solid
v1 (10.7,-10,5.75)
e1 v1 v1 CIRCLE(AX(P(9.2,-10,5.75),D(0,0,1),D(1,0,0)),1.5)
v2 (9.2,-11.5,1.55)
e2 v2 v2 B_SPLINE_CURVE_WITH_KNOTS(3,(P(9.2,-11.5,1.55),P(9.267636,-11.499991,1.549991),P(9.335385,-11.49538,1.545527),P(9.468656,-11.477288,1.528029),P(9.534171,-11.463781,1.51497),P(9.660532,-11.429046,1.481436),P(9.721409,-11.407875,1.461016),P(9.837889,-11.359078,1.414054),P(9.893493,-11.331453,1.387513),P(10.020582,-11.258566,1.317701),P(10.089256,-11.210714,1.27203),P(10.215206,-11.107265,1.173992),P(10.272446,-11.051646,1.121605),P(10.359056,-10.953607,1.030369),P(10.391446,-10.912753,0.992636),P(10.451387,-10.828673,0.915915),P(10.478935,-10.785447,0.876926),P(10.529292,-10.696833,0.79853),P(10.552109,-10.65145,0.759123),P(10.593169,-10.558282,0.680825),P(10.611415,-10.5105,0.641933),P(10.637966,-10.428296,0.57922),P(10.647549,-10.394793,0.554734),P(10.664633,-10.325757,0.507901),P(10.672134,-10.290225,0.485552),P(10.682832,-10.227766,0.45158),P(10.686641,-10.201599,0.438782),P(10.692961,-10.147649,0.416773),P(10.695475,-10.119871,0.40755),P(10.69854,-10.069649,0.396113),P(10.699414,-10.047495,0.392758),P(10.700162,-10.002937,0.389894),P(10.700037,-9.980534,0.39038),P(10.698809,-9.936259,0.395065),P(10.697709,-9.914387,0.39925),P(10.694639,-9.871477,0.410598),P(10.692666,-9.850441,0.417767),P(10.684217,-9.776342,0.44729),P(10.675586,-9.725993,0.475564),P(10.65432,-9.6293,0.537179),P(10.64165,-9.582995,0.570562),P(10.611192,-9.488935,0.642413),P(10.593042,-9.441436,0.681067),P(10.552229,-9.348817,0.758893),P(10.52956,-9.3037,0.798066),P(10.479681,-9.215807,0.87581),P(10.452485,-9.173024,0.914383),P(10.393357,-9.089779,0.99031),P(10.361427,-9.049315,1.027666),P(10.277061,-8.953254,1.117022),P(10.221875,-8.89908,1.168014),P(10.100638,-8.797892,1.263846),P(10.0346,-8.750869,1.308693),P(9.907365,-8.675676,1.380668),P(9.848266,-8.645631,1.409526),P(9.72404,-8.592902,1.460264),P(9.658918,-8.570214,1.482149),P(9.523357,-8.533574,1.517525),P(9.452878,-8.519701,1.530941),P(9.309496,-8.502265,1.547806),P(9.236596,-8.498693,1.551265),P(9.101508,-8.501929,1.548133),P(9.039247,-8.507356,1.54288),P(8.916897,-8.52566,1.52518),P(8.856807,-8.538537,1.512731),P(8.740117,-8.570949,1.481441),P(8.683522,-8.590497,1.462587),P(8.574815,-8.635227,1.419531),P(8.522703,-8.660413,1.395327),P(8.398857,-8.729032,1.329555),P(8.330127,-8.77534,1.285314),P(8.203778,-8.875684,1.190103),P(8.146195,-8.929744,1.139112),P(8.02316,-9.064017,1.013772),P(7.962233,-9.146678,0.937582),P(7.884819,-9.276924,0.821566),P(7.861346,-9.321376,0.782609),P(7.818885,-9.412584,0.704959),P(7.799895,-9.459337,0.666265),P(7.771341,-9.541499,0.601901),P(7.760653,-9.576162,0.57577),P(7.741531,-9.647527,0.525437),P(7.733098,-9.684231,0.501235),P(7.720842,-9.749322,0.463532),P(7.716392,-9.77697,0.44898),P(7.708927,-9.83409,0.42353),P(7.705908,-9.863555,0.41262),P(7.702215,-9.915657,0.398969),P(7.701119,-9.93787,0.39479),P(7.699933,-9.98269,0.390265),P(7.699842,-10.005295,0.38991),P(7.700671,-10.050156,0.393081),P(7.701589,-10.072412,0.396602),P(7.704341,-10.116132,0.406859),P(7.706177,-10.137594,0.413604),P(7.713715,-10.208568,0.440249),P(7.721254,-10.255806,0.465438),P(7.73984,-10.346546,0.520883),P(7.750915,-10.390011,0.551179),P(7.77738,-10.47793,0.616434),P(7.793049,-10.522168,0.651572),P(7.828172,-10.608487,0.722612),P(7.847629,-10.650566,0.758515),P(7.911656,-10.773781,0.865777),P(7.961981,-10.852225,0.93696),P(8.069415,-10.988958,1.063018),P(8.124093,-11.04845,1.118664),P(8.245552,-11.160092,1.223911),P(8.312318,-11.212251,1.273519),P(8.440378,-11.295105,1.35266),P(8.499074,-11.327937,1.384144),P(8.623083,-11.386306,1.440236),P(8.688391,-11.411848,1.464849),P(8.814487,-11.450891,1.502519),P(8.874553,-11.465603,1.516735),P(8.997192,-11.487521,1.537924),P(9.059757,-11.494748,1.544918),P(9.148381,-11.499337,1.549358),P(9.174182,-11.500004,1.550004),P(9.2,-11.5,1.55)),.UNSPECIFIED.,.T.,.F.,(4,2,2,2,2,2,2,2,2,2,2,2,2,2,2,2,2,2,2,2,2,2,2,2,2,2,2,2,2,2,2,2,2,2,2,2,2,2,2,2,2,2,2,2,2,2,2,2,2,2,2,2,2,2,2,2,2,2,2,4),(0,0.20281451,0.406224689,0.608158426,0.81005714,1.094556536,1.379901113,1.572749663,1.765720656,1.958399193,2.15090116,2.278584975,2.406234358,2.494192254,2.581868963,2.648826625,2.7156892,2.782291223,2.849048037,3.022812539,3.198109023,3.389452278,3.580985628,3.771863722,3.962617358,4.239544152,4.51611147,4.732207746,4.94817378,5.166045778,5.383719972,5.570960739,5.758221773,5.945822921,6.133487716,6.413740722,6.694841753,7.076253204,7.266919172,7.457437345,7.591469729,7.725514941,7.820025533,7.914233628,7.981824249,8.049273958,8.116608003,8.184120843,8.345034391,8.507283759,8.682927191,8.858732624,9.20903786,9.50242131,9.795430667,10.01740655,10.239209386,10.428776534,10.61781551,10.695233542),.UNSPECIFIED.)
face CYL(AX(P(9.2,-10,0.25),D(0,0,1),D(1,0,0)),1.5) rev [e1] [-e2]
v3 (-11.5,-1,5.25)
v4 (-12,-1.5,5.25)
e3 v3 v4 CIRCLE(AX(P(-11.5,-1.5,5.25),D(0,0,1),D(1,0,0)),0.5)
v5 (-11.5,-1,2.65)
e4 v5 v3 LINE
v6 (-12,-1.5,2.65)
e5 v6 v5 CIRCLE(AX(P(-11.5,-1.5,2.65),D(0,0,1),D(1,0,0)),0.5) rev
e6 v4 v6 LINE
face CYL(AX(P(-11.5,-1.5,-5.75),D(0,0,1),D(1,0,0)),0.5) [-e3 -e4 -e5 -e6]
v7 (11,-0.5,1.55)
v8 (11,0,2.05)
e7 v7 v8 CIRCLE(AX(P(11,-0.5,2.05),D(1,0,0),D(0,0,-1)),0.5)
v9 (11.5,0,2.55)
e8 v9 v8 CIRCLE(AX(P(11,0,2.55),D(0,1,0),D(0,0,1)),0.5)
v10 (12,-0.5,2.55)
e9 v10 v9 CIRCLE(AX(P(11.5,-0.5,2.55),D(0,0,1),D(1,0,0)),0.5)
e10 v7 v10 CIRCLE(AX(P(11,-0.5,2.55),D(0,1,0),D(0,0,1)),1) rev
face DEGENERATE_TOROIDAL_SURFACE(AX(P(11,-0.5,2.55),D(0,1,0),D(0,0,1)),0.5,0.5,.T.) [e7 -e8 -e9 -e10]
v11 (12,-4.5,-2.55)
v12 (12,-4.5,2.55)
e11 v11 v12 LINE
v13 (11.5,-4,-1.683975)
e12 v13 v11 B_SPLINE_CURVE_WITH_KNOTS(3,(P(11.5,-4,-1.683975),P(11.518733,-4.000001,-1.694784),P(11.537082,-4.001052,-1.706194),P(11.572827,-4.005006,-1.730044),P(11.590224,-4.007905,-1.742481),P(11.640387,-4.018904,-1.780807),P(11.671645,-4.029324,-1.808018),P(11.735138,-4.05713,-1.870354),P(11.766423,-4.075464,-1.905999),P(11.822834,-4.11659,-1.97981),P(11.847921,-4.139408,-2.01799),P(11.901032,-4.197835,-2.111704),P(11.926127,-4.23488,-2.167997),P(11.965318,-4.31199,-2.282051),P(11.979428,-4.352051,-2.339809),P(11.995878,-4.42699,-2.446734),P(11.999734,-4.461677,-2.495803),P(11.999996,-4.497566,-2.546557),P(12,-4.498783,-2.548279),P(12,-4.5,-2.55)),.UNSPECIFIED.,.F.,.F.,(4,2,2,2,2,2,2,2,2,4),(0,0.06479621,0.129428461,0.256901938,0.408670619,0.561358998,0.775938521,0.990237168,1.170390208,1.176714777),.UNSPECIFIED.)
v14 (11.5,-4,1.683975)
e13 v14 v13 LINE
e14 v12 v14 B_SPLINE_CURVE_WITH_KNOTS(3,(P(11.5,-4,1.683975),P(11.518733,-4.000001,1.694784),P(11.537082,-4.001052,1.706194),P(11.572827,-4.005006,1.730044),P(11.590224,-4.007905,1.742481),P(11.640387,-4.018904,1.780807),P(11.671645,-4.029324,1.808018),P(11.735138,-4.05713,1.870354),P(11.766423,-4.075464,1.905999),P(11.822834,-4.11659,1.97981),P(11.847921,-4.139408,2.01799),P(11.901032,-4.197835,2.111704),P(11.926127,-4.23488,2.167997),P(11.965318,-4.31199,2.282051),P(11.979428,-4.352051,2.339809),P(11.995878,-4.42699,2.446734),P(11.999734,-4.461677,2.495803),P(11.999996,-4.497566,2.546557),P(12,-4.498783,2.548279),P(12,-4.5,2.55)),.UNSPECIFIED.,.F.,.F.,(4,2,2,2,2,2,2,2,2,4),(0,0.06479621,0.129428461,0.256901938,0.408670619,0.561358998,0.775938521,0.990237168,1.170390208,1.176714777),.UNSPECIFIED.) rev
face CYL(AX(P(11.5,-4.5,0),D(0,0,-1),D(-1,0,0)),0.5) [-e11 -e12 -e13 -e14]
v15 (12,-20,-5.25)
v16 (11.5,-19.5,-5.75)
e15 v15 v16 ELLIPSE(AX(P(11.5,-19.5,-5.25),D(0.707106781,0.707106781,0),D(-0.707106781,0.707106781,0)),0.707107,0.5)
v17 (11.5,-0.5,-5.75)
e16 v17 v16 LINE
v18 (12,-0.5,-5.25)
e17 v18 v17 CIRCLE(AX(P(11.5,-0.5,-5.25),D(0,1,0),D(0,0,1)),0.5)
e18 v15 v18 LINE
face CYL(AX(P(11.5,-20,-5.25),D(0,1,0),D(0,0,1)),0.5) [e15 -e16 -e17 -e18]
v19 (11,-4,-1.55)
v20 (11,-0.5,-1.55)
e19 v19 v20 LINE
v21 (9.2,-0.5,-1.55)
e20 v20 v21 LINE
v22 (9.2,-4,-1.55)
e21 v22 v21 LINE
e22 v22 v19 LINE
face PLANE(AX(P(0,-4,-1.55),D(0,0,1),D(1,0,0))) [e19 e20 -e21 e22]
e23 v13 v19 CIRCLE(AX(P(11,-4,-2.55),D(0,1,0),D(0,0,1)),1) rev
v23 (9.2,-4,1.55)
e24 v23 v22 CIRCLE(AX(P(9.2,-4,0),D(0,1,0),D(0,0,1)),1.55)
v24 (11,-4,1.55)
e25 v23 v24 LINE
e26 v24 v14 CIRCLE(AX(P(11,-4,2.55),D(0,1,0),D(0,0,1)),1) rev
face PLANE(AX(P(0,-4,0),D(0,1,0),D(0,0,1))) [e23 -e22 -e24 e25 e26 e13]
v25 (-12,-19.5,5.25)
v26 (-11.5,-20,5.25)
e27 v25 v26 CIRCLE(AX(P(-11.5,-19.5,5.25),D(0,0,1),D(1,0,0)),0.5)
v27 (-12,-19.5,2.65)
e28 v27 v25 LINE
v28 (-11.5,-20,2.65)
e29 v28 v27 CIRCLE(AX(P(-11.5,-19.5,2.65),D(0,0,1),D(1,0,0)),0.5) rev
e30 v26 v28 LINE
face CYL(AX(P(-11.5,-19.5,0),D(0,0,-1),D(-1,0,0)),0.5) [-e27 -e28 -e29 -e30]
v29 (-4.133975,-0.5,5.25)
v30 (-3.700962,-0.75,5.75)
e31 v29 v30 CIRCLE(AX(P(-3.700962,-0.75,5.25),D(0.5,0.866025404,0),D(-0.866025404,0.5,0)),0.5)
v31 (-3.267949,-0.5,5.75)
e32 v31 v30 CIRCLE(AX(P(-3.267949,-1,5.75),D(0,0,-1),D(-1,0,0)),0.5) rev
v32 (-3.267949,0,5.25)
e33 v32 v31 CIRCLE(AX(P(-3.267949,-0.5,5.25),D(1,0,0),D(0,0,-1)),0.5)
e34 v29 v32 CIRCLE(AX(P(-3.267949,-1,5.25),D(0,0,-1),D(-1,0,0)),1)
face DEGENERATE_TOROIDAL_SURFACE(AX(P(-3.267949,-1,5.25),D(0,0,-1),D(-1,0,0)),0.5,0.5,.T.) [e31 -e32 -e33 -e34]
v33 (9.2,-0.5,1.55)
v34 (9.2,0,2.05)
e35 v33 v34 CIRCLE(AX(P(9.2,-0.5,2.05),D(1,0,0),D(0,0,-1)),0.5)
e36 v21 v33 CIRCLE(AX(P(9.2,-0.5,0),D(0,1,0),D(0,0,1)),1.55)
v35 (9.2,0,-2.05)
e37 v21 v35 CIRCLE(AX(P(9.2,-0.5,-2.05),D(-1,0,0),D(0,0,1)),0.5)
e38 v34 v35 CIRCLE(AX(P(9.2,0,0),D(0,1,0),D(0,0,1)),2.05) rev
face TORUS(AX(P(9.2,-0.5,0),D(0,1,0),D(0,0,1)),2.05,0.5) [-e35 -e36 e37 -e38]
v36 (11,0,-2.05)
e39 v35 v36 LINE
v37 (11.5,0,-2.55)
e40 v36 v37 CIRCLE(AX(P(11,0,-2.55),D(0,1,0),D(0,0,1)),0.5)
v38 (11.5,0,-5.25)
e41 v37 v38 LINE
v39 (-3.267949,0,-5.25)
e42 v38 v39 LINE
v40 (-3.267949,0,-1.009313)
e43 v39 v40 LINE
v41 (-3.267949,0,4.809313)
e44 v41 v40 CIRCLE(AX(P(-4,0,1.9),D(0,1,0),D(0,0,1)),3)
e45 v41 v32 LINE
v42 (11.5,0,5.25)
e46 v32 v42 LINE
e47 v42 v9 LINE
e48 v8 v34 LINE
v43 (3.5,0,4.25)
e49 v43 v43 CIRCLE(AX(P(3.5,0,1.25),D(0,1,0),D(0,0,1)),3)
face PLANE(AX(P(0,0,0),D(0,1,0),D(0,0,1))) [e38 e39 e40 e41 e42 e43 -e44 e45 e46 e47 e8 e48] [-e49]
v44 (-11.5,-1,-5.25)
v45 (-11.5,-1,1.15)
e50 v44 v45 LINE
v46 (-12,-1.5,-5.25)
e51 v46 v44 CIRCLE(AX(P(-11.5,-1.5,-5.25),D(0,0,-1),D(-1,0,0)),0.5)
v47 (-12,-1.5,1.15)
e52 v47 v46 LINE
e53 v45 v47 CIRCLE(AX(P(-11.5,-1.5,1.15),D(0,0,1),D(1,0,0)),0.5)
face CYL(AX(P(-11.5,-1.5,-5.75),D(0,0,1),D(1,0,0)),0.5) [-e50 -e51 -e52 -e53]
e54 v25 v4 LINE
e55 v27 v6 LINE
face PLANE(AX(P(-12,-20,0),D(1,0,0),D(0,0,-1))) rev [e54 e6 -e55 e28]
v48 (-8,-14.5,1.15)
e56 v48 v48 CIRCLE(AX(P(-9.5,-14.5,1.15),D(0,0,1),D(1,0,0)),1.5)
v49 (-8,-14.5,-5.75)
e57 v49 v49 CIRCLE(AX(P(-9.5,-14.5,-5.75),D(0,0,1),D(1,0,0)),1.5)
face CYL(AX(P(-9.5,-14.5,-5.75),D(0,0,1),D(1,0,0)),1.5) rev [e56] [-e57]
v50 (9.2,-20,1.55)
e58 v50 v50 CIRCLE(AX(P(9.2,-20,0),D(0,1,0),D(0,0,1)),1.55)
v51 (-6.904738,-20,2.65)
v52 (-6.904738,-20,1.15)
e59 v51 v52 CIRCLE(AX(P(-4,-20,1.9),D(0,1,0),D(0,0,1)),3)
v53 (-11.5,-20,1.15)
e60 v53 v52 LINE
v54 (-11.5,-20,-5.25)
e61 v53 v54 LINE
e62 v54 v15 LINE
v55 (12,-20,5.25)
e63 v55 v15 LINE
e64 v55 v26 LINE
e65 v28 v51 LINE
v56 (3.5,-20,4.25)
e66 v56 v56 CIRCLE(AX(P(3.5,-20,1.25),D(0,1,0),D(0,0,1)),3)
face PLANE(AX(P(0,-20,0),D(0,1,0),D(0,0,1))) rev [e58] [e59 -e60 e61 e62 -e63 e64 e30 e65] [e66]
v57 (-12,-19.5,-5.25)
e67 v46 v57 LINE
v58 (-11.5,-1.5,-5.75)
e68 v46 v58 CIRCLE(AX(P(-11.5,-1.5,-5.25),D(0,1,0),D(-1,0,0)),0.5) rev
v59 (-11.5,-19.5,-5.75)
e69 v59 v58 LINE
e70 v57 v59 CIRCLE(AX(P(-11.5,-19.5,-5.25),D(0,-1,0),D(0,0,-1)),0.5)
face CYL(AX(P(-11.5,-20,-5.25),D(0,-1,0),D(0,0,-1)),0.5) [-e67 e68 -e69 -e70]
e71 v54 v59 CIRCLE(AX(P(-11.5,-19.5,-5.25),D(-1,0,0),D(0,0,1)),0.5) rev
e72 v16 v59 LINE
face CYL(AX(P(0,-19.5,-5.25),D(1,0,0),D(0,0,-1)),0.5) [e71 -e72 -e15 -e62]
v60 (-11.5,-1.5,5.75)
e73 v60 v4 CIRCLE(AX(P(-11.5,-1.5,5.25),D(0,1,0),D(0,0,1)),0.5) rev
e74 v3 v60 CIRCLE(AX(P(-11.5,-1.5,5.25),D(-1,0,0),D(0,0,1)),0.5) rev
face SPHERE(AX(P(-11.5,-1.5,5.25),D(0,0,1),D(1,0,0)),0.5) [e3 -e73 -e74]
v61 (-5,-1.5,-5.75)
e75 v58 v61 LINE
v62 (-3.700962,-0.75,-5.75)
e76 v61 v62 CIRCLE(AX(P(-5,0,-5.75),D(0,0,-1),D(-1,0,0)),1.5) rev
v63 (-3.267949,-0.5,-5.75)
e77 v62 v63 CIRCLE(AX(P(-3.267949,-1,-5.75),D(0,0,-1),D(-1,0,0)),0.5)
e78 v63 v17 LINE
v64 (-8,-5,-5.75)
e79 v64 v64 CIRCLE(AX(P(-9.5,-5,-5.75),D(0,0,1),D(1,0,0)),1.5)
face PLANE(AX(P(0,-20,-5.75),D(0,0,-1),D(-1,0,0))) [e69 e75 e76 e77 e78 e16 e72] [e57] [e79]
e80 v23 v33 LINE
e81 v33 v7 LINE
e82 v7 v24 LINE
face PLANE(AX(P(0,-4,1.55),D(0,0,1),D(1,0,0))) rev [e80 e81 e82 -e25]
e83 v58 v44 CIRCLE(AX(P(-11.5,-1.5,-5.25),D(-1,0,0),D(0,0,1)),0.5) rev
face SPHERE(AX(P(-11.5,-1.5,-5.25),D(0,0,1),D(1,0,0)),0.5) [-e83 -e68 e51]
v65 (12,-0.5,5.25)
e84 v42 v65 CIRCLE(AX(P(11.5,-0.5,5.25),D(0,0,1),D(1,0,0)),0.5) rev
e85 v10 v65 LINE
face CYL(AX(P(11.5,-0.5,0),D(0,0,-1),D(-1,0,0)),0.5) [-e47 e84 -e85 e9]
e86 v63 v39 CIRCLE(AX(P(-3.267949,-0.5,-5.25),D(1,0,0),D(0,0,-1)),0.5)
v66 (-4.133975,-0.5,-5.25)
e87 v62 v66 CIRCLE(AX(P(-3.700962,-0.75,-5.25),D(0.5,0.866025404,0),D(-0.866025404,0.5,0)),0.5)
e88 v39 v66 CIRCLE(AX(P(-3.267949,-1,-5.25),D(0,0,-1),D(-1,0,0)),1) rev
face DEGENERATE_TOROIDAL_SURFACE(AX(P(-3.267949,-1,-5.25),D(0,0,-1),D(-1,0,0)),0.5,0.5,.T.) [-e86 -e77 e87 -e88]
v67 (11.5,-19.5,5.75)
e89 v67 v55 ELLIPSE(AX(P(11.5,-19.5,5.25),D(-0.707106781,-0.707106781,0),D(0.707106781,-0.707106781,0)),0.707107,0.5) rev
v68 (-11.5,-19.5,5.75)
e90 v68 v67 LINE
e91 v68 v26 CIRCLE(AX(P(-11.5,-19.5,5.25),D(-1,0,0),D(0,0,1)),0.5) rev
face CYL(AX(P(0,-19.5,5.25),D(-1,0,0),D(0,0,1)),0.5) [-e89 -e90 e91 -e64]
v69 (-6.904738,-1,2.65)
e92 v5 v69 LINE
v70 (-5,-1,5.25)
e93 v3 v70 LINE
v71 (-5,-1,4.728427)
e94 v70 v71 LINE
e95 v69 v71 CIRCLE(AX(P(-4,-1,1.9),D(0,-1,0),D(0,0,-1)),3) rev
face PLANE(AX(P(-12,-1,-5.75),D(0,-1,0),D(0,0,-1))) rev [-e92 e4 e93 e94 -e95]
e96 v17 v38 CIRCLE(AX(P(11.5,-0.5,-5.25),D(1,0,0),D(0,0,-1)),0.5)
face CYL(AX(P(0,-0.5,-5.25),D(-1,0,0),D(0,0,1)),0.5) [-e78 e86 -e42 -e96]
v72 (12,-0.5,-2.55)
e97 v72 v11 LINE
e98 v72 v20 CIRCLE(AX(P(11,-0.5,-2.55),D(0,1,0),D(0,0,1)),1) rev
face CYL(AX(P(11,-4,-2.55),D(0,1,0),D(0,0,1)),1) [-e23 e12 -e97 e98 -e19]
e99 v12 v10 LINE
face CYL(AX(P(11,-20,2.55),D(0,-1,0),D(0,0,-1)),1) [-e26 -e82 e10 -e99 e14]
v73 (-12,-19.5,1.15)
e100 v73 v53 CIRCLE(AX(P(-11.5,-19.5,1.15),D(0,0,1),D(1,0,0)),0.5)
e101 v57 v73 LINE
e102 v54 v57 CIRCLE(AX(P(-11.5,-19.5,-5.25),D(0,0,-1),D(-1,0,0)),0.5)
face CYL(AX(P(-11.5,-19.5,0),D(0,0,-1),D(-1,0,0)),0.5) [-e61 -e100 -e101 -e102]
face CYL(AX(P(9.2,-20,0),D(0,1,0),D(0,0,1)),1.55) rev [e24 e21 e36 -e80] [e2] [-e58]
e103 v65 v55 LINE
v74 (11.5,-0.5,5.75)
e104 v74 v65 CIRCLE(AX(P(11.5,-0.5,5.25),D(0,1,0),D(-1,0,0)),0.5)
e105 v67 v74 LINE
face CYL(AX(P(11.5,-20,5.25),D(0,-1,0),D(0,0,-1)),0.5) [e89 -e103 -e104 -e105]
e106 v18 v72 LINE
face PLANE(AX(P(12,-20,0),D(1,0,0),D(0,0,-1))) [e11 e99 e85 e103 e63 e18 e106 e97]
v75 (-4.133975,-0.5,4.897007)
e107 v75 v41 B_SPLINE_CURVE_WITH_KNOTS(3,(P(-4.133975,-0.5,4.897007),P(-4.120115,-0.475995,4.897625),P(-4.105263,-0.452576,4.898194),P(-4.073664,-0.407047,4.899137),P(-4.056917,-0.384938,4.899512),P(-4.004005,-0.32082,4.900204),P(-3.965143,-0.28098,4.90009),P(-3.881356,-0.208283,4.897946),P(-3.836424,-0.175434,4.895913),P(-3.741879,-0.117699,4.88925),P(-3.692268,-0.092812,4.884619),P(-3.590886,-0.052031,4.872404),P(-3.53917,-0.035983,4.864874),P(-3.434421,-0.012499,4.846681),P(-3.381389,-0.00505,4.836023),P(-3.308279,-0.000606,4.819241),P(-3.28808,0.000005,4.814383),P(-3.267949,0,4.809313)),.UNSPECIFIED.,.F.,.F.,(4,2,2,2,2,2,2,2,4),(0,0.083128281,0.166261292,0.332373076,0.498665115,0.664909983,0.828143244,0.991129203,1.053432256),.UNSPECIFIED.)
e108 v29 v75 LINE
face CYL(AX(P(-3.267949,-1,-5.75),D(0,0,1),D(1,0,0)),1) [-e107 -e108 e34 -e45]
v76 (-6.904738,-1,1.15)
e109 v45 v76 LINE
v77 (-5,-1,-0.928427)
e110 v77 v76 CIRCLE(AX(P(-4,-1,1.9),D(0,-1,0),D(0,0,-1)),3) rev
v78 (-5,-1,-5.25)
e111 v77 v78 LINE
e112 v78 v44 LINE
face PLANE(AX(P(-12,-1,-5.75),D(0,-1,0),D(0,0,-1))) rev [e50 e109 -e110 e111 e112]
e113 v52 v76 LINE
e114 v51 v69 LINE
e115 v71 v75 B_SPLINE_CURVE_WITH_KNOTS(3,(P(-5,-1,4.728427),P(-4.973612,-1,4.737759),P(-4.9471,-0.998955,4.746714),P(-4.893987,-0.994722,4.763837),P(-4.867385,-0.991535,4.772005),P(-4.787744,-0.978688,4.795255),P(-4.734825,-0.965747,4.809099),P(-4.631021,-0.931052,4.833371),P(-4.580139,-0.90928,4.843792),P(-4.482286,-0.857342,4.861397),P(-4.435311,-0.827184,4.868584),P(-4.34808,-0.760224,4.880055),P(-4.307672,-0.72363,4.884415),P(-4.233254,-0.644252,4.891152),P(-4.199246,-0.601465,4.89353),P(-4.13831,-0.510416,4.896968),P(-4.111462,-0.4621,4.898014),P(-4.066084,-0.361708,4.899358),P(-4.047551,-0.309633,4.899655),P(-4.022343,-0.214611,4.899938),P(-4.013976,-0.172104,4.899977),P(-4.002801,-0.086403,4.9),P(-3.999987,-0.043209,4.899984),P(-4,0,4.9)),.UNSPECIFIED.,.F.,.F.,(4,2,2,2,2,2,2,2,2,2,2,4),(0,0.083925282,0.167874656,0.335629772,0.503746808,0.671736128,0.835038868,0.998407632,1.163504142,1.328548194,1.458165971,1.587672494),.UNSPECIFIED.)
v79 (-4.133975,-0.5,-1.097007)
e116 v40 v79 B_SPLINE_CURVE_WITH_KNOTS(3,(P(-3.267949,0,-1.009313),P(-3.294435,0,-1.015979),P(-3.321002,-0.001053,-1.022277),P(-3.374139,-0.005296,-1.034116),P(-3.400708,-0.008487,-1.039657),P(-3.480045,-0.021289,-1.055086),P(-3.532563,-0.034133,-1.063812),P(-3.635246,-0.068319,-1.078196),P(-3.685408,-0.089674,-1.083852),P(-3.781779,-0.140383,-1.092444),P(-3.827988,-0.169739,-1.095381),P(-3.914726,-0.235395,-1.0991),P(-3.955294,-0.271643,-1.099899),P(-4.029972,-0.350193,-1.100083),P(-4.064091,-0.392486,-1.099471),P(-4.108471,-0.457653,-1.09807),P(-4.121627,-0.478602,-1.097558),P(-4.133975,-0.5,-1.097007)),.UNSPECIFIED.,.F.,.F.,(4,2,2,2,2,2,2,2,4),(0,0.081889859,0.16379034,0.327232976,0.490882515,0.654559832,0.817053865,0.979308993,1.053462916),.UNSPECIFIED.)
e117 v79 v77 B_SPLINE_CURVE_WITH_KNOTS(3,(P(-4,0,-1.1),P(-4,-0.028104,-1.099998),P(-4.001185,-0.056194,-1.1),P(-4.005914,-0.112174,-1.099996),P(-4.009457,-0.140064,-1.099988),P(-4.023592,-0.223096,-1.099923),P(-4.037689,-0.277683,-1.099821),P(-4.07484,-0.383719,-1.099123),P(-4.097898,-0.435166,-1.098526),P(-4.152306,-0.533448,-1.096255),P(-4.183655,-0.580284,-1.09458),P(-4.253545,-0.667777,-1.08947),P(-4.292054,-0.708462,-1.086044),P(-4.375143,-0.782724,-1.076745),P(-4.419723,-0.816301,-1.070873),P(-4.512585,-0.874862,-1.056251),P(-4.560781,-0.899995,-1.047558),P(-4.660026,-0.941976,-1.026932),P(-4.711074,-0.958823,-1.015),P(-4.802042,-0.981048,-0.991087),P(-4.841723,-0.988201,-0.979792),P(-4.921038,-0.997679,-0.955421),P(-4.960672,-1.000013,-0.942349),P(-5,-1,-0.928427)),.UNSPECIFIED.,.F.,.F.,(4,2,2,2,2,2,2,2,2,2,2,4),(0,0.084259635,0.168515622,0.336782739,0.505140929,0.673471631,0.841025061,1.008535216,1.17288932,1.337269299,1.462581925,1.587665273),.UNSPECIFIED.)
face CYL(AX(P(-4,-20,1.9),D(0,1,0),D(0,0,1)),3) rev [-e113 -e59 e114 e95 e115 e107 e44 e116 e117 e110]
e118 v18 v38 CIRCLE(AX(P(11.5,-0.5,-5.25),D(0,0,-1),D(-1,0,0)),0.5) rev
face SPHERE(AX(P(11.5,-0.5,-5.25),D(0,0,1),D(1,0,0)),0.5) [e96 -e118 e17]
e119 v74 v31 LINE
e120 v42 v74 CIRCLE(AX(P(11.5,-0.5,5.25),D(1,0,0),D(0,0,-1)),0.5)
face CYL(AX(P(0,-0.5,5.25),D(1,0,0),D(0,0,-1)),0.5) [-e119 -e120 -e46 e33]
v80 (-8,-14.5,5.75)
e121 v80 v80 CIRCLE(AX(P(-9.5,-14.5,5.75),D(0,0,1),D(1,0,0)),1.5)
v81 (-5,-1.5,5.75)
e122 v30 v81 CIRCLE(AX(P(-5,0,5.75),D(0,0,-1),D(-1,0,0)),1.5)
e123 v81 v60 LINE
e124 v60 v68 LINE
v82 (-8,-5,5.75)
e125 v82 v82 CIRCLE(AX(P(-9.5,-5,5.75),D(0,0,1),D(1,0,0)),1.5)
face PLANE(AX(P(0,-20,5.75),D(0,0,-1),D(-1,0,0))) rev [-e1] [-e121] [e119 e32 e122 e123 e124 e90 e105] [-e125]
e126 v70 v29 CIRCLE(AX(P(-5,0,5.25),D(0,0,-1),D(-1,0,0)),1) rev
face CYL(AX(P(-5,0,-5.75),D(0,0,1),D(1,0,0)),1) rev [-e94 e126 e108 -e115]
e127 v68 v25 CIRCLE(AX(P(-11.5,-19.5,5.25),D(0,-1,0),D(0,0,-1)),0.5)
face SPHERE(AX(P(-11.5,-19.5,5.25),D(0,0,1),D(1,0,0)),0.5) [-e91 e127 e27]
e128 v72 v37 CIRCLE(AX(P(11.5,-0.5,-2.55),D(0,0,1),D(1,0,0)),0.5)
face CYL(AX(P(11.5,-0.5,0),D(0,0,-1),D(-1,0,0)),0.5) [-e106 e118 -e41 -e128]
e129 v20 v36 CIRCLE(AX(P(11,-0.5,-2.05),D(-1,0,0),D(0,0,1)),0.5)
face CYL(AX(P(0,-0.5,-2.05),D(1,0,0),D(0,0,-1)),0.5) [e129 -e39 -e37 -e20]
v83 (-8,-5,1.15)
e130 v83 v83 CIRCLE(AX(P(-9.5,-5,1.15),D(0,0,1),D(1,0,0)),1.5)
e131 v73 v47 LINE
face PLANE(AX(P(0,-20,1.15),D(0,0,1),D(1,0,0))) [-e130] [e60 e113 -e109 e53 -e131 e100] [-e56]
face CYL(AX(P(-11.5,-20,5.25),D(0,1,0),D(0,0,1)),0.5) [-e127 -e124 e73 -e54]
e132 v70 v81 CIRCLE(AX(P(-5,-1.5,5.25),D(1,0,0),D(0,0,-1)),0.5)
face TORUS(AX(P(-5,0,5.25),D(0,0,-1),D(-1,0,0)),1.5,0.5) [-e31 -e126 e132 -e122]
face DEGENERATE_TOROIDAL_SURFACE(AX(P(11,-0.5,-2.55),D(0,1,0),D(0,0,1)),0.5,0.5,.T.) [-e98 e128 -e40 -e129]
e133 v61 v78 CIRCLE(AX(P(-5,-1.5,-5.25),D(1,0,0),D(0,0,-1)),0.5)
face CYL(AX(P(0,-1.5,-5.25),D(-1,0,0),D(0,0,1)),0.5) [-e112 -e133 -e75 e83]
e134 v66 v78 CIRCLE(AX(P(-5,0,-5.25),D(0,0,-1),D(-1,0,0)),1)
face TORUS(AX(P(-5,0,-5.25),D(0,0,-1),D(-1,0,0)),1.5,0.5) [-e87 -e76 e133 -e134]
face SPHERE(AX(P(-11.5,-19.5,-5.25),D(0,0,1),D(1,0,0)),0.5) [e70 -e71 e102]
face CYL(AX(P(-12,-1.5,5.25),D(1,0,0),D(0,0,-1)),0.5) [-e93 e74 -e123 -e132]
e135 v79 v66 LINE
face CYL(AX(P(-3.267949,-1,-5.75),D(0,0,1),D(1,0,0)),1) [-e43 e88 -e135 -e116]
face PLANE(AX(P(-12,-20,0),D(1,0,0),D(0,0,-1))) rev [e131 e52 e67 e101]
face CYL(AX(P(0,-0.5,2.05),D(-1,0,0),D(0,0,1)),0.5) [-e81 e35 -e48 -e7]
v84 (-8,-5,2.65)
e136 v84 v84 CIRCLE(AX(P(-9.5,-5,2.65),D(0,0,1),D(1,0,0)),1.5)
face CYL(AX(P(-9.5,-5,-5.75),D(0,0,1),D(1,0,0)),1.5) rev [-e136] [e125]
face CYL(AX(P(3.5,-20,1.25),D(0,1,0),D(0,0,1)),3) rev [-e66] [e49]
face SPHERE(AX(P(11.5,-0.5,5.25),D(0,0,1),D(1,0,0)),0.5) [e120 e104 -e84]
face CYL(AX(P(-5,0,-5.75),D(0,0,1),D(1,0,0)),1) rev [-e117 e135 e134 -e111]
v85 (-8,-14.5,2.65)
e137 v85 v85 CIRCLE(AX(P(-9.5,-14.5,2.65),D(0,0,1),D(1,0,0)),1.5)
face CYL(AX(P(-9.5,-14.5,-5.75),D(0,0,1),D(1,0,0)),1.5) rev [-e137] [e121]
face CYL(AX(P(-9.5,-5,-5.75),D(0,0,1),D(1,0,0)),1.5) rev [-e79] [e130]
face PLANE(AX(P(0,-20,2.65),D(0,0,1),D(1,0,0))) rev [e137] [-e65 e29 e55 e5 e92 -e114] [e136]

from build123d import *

# Parameters (mm, degrees)
DODANIE_WYCI_GNI_CIE1_DEPTH = 20
WYTNIJ_WYCI_GNI_CIE1_DEPTH  = 4
SZKIC2_W                    = 8
SZKIC2_H                    = 1
WYTNIJ_WYCI_GNI_CIE2_DEPTH  = 27.004807248
SZKIC2_3_R                  = 1.5
WYTNIJ_WYCI_GNI_CIE3_DEPTH  = 5.5
SZKIC2_4_R                  = 1.5
WYTNIJ_WYCI_GNI_CIE4_DEPTH  = 27.004807325
ZAOKR_GLENIE1_R             = 1
ZAOKR_GLENIE2_R             = 1
ZAOKR_GLENIE3_R             = 1
ZAOKR_GLENIE4_R             = 0.5
ZAOKR_GLENIE5_R             = 0.5


with BuildPart() as part:
    # Szkic1 → Dodanie-wyciągnięcie1 (new body)
    with BuildSketch(Plane(origin=(0, 0, 0), x_dir=(1, 0, 0), z_dir=(0, 1, 0))):
        with BuildLine():
            Line((9.2, 1.55), (12, 1.55))
            Line((12, 1.55), (12, 5.75))
            Line((12, 5.75), (-12, 5.75))
            Line((-12, 5.75), (-12, 0))
            Line((-12, 0), (-6.321637353, 0))
            ThreePointArc((-6.321637353, 0), (-4, 1.1), (-1.678362647, 0))
            Line((-1.678362647, 0), (0.772821971, 0))
            ThreePointArc((0.772821971, 0), (3.5, 1.75), (6.227178029, 0))
            Line((6.227178029, 0), (7.65, 0))
            ThreePointArc((7.65, 0), (8.103984489, 1.096015511), (9.2, 1.55))
        make_face()
        with BuildLine():
            Line((-6.321637353, 0), (-12, 0))
            Line((-12, 0), (-12, -1.15))
            Line((-12, -1.15), (-6.90473751, -1.15))
            ThreePointArc((-6.90473751, -1.15), (-6.675700572, -0.543303111), (-6.321637353, 0))
        make_face()
        with BuildLine():
            Line((12, -5.75), (12, -1.55))
            Line((12, -1.55), (9.2, -1.55))
            ThreePointArc((9.2, -1.55), (8.103984489, -1.096015511), (7.65, 0))
            Line((7.65, 0), (6.227178029, 0))
            ThreePointArc((6.227178029, 0), (6.431001031, -0.610286817), (6.5, -1.25))
            ThreePointArc((6.5, -1.25), (2.860286817, -4.181001031), (0.772821971, 0))
            Line((0.772821971, 0), (-1.678362647, 0))
            ThreePointArc((-1.678362647, 0), (-2.643303111, -4.575700572), (-6.90473751, -2.65))
            Line((-6.90473751, -2.65), (-12, -2.65))
            Line((-12, -2.65), (-12, -5.75))
            Line((-12, -5.75), (12, -5.75))
        make_face()
        with BuildLine():
            Line((12, -1.55), (12, 0))
            Line((12, 0), (10.75, 0))
            ThreePointArc((10.75, 0), (10.296015511, -1.096015511), (9.2, -1.55))
            Line((9.2, -1.55), (12, -1.55))
        make_face()
        with BuildLine():
            Line((10.75, 0), (12, 0))
            Line((12, 0), (12, 1.55))
            Line((12, 1.55), (9.2, 1.55))
            ThreePointArc((9.2, 1.55), (10.296015511, 1.096015511), (10.75, 0))
        make_face()
    extrude(amount=-DODANIE_WYCI_GNI_CIE1_DEPTH)

    # Szkic1<4> → Wytnij-wyciągnięcie1 (cut)
    with BuildSketch(Plane(origin=(0, 0, 0), x_dir=(1, 0, 0), z_dir=(0, 1, 0))):
        with BuildLine():
            Line((10.75, 0), (12, 0))
            Line((12, 0), (12, 1.55))
            Line((12, 1.55), (9.2, 1.55))
            ThreePointArc((9.2, 1.55), (10.296015511, 1.096015511), (10.75, 0))
        make_face()
        with BuildLine():
            Line((12, -1.55), (12, 0))
            Line((12, 0), (10.75, 0))
            ThreePointArc((10.75, 0), (10.296015511, -1.096015511), (9.2, -1.55))
            Line((9.2, -1.55), (12, -1.55))
        make_face()
    extrude(amount=-WYTNIJ_WYCI_GNI_CIE1_DEPTH, mode=Mode.SUBTRACT)

    # Szkic2 → Wytnij-wyciągnięcie2 (cut, through all)
    with BuildSketch(Plane.XY.offset(5.75)):
        with Locations((-8, -0.5)):
            Rectangle(SZKIC2_W, SZKIC2_H)
    extrude(amount=-WYTNIJ_WYCI_GNI_CIE2_DEPTH, mode=Mode.SUBTRACT)

    # Szkic2<3> → Wytnij-wyciągnięcie3 (cut)
    with BuildSketch(Plane.XY.offset(5.75)):
        with Locations((9.2, -10)):
            Circle(SZKIC2_3_R)
    extrude(amount=-WYTNIJ_WYCI_GNI_CIE3_DEPTH, mode=Mode.SUBTRACT)

    # Szkic2<4> → Wytnij-wyciągnięcie4 (cut, through all)
    with BuildSketch(Plane.XY.offset(5.75)):
        with Locations((-9.5, -5)):
            Circle(SZKIC2_4_R)
        with Locations((-9.5, -14.5)):
            Circle(SZKIC2_4_R)
    extrude(amount=-WYTNIJ_WYCI_GNI_CIE4_DEPTH, mode=Mode.SUBTRACT)

    # Zaokrąglenie1
    zaokr_glenie1_edges = [part.edges().sort_by_distance(p)[0] for p in [
        (-4, -1, -3.425),
        (-4, -1, 5.325),
    ]]
    fillet(zaokr_glenie1_edges, radius=ZAOKR_GLENIE1_R - 0.0001)  # a hair under: the kernel refuses the full size

    # Zaokrąglenie2
    zaokr_glenie2_edges = [part.edges().sort_by_distance(p)[0] for p in [
        (-4, 0, 5.325),
        (-4, 0, -3.425),
    ]]
    fillet(zaokr_glenie2_edges, radius=ZAOKR_GLENIE2_R)

    # Zaokrąglenie3
    zaokr_glenie3_edges = [part.edges().sort_by_distance(p)[0] for p in [
        (12, -2, -1.55),
        (12, -2, 1.55),
    ]]
    fillet(zaokr_glenie3_edges, radius=ZAOKR_GLENIE3_R)

    # Zaokrąglenie4
    zaokr_glenie4_edges = [part.edges().sort_by_distance(p)[0] for p in [
        (-4.499937501, -0.866031585, -5.75),
        (-4.499937501, -0.866031585, 5.75),
        (-3.767919429, -0.133981813, 5.75),
        (-3.767919429, -0.133981813, -5.75),
        (12, 0, -4.15),
        (11.707106781, 0, -1.842893219),
        (11.707106781, 0, 1.842893219),
        (4.366046536, 0, -5.75),
        (12, 0, 4.15),
        (4.366046536, 0, 5.75),
        (0, -20, 5.75),
        (-12, -10.5, 5.75),
        (-12, -10.5, -5.75),
        (12, -10, -5.75),
        (12, -10, 5.75),
        (0, -20, -5.75),
        (-12, -20, -2.3),
        (7.65, 0, 0),
        (10.1, 0, -1.55),
        (10.1, 0, 1.55),
        (-12, -20, 4.2),
        (-8.49995, -1, -5.75),
        (-12, -1, 4.2),
        (-12, -1, -2.3),
        (-8.49995, -1, 5.75),
    ]]
    fillet(zaokr_glenie4_edges, radius=ZAOKR_GLENIE4_R)

    # Zaokrąglenie5
    zaokr_glenie5_edges = [part.edges().sort_by_distance(p)[0] for p in [
        (12, -4, 0),
    ]]
    fillet(zaokr_glenie5_edges, radius=ZAOKR_GLENIE5_R)


solid = part.part
